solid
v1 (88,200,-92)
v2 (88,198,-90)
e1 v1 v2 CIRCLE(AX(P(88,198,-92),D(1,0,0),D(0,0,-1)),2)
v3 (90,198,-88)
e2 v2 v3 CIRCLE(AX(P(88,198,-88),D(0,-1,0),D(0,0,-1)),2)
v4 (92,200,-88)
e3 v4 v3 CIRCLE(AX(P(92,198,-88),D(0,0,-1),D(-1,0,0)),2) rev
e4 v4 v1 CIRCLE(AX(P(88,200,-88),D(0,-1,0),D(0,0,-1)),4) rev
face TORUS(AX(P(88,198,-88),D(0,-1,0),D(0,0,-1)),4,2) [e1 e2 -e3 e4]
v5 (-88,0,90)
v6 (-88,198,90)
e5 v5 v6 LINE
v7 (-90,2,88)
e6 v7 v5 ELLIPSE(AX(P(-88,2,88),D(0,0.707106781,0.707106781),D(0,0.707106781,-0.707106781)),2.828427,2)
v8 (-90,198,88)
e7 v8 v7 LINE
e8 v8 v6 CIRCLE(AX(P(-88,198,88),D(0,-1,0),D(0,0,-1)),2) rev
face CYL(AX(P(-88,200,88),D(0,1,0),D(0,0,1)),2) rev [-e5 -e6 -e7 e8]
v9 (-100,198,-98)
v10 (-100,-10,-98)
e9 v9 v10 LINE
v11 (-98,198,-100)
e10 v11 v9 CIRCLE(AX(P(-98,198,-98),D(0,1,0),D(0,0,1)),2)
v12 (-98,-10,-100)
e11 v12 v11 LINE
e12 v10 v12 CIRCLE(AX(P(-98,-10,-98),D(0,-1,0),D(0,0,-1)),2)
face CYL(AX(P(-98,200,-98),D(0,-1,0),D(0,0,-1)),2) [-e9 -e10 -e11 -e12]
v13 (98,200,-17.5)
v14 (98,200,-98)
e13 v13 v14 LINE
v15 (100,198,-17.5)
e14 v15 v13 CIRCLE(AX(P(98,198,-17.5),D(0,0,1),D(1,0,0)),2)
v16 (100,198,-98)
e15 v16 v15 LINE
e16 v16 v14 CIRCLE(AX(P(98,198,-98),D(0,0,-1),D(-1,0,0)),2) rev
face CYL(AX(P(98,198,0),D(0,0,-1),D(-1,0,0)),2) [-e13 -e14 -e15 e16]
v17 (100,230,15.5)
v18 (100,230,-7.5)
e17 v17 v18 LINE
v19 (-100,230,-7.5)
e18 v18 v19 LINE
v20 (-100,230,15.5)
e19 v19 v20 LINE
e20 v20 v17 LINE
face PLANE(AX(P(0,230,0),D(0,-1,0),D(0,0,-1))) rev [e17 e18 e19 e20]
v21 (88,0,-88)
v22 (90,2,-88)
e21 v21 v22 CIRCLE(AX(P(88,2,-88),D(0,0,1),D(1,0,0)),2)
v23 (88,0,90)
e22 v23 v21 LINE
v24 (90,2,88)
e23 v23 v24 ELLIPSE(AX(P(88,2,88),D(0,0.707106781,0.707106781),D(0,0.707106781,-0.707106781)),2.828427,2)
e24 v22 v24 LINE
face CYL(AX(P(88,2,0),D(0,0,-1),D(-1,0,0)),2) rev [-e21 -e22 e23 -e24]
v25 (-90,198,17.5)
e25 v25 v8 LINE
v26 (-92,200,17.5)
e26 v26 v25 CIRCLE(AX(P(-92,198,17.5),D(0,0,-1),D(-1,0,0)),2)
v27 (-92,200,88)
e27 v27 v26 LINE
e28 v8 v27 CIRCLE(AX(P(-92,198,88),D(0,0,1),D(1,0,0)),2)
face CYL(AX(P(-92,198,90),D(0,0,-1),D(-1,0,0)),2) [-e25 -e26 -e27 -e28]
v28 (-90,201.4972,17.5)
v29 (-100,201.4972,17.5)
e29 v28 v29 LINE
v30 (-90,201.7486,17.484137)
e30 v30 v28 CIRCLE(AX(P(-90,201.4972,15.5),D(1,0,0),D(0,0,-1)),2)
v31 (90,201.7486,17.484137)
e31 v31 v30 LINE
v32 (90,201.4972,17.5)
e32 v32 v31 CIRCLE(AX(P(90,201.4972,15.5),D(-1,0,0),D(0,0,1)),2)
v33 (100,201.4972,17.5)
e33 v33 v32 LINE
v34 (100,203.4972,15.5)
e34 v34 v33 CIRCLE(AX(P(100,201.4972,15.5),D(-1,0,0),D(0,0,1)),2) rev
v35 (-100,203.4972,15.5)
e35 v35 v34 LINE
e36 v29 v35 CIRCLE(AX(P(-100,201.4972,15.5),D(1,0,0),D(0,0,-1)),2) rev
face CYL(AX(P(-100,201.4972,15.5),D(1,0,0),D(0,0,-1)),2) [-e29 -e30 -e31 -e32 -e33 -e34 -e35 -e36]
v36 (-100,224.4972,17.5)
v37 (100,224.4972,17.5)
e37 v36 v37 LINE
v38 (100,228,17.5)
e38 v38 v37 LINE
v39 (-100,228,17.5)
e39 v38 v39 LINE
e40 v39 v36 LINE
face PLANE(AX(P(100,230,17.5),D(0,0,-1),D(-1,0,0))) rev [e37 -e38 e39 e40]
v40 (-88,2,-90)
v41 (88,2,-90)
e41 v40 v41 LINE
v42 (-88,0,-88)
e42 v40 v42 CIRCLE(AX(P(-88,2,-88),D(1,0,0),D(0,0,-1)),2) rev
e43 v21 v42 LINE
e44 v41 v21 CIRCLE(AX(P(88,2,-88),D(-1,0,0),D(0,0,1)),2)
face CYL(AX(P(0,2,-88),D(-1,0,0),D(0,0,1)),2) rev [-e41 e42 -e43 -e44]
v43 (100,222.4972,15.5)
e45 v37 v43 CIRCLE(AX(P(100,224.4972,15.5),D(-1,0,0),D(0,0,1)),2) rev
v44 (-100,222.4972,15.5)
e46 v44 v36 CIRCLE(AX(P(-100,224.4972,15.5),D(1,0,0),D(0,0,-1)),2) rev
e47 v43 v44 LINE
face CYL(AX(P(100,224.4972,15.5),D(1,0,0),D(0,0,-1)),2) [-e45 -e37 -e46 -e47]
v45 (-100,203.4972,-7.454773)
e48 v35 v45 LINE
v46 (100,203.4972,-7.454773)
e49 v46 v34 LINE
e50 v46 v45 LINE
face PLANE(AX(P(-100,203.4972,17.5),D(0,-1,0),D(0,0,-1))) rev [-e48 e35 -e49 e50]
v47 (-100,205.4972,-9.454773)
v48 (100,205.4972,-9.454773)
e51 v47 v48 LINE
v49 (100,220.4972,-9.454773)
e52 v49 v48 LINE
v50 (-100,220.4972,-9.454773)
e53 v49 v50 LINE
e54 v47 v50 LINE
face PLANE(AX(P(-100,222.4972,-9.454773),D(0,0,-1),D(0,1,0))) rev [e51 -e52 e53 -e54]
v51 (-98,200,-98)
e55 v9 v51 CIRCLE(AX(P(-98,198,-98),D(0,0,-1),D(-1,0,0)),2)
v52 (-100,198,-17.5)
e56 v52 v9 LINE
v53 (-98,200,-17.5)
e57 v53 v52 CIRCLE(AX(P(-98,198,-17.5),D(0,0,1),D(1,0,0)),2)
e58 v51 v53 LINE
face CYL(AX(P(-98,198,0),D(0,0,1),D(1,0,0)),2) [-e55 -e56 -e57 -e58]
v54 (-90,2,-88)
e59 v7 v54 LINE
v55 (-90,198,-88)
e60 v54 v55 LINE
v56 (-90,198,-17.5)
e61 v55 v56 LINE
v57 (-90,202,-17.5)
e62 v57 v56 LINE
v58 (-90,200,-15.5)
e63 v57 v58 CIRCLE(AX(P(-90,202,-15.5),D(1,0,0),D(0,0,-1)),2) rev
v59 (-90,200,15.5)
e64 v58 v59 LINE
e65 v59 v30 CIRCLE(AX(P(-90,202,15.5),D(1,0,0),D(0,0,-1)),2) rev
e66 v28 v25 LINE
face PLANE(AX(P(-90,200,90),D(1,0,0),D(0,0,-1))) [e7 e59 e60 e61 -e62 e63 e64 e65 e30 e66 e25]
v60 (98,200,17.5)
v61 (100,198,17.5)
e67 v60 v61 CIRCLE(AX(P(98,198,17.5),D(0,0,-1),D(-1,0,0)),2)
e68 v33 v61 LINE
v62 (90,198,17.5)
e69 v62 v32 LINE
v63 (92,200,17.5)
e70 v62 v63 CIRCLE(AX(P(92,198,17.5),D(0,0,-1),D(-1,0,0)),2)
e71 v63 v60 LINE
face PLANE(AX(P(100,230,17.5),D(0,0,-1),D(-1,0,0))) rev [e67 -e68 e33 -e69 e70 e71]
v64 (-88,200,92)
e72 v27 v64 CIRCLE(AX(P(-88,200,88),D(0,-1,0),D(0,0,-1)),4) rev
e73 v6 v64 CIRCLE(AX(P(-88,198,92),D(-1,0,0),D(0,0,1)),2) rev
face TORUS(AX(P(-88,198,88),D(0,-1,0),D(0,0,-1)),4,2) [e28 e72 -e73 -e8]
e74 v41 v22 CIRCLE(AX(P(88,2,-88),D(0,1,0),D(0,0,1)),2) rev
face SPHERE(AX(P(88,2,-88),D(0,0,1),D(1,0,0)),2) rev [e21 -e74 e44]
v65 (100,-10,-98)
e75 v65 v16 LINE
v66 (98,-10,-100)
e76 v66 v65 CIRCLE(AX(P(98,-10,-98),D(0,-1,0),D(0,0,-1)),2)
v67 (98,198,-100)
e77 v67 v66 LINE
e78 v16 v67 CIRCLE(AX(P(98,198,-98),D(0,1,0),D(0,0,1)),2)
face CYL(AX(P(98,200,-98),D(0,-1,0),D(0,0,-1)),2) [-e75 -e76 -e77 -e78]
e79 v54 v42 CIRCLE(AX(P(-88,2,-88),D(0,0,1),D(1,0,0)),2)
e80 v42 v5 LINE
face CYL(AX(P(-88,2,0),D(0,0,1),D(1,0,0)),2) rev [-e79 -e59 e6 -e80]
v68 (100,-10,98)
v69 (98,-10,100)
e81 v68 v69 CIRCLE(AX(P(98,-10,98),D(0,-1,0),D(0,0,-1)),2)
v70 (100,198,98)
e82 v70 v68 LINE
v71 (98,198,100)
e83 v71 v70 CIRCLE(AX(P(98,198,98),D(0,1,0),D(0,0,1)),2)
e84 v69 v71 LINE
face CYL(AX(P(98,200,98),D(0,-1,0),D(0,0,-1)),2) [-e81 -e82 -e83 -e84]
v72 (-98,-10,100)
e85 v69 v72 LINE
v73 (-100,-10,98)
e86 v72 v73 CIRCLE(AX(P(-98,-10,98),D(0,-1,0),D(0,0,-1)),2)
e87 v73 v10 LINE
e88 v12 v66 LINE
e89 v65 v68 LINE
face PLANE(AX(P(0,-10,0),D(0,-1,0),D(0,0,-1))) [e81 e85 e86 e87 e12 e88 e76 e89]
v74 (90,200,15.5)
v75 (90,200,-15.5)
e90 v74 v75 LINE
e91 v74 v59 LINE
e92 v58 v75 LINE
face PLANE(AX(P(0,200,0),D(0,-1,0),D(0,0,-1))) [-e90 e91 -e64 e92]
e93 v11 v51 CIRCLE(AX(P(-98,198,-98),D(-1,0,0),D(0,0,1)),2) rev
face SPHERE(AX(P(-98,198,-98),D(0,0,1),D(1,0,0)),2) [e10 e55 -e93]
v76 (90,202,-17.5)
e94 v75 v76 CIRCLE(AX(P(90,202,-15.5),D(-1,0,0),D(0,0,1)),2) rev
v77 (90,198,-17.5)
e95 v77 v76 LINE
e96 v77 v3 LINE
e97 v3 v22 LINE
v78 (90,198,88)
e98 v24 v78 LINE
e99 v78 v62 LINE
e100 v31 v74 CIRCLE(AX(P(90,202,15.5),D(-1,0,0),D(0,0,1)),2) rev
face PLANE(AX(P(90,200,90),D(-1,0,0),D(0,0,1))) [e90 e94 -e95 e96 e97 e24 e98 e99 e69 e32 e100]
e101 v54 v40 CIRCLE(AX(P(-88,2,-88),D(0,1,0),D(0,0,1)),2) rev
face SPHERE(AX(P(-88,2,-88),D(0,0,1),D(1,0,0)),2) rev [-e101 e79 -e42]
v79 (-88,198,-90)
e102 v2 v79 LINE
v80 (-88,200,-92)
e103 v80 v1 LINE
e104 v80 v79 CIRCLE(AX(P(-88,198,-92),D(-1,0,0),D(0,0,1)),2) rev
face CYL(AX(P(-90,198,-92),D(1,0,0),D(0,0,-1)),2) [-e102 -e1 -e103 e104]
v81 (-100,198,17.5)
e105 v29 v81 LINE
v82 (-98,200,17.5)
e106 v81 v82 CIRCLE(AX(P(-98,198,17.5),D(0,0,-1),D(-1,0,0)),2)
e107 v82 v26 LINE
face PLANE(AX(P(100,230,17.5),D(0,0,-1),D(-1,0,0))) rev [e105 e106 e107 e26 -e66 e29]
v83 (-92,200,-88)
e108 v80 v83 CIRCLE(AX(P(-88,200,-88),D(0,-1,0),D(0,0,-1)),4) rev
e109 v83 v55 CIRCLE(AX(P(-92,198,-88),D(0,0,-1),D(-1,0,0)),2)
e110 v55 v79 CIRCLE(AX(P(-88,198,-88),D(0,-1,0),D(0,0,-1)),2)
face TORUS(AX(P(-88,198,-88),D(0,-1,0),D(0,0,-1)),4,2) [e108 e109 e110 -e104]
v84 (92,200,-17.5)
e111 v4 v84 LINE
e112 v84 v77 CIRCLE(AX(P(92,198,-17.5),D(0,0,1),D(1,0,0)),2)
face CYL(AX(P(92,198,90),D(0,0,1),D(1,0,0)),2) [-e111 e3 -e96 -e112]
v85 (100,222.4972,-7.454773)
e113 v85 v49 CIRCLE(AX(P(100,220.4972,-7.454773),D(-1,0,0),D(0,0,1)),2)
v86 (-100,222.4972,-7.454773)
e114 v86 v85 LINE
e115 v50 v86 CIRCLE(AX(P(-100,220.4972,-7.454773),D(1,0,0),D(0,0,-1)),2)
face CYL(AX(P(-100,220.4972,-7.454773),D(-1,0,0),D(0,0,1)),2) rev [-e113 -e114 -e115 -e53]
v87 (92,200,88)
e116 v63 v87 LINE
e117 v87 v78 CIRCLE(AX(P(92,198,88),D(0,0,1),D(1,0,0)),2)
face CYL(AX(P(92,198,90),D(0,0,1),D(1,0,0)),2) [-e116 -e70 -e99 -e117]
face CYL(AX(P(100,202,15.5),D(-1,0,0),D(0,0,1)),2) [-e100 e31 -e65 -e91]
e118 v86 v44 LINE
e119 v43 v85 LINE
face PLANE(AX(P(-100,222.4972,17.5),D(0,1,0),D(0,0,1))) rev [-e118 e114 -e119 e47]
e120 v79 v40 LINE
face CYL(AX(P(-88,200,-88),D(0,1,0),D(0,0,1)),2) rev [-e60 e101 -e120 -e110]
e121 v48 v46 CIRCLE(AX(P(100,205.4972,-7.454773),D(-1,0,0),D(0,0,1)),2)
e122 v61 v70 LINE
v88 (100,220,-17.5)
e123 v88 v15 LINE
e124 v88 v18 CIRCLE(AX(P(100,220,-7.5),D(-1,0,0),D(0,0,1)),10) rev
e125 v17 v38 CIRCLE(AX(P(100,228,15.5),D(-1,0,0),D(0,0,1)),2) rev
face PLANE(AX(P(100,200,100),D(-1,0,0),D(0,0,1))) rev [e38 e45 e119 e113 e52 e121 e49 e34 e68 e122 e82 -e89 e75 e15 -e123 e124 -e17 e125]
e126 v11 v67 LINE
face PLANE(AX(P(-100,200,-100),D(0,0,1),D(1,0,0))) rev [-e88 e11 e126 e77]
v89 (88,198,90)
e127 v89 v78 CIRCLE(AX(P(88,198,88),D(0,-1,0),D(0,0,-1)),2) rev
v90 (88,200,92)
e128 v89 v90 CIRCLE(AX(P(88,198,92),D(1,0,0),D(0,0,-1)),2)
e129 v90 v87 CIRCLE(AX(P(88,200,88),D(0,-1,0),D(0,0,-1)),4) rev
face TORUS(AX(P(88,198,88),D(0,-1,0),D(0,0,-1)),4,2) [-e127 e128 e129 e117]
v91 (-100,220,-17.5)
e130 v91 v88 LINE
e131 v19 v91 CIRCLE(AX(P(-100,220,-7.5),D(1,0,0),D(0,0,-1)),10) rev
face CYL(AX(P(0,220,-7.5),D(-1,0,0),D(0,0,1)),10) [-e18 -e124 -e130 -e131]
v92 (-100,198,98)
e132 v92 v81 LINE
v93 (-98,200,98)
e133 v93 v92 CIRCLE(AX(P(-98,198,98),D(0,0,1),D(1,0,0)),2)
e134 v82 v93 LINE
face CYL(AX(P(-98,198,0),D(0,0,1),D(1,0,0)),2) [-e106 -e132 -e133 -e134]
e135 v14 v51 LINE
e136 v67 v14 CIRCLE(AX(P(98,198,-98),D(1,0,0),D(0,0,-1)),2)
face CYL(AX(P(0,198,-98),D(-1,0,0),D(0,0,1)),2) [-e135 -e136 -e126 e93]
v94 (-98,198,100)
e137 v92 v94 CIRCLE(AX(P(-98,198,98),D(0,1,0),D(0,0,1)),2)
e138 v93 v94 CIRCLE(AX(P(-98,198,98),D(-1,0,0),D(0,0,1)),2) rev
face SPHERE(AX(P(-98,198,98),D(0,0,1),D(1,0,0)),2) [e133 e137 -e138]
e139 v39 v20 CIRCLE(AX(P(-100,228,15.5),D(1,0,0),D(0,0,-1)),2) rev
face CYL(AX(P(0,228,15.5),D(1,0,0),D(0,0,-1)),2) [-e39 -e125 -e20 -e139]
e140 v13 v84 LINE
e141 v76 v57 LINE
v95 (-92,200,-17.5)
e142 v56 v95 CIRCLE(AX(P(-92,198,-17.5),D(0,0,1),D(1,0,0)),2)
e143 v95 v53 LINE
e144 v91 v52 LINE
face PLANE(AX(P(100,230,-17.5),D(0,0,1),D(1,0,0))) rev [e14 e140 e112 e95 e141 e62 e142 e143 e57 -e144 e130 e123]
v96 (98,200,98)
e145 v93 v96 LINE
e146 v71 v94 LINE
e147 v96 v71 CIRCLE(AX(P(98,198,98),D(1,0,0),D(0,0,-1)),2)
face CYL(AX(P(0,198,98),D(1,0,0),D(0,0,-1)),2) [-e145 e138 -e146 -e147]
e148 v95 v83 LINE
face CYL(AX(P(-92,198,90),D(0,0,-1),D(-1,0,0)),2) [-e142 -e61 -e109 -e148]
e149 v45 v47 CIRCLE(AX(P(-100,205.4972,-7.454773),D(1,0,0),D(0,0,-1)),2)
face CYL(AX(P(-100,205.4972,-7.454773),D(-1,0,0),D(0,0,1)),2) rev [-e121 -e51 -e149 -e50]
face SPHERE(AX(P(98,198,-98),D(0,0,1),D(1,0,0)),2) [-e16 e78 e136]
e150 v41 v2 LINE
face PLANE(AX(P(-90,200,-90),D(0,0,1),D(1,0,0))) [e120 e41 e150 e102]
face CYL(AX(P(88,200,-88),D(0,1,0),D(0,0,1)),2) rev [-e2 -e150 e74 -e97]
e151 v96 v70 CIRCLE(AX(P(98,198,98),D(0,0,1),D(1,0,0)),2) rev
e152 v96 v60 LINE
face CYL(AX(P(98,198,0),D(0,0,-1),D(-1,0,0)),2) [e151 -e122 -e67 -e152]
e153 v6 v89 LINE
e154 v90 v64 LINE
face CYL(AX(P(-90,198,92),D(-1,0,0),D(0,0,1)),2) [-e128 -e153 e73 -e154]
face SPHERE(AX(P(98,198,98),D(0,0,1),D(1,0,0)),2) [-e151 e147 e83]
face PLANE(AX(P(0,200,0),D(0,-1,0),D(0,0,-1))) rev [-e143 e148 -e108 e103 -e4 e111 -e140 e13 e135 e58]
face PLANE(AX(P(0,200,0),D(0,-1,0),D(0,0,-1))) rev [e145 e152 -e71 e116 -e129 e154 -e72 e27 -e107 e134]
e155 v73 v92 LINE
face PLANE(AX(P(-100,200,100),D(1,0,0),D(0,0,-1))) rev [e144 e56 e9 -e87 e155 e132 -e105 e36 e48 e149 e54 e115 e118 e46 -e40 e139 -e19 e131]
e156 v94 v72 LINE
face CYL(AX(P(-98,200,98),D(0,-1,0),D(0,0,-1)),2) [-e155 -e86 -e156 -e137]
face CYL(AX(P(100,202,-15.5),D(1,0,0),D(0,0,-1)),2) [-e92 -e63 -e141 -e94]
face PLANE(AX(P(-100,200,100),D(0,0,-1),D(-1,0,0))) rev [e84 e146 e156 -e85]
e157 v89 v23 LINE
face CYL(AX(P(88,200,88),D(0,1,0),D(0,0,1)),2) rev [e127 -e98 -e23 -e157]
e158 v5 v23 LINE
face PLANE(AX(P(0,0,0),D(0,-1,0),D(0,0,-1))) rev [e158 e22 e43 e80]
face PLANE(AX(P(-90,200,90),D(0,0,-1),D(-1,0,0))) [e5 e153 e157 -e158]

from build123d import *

# Parameters (mm, degrees)
SKETCH1_W               = 200
SKETCH1_H               = 200
SKETCH1_W_2             = 180
SKETCH1_H_2             = 180
BOSS_EXTRUDE1_DEPTH     = 200
SKETCH2_W               = 200
SKETCH2_H               = 200
BOSS_EXTRUDE2_DEPTH     = 10
SKETCH3_W               = 200
SKETCH3_H               = 35
BOSS_EXTRUDE3_DEPTH     = 30
CUT_EXTRUDE1_DEPTH      = 321.780298647
CUT_EXTRUDE1_DEPTH_BACK = 321.780298647
SKETCH4_W               = 26.954773083
SKETCH4_H               = 19
FILLET1_R               = 10
FILLET3_R               = 2
FILLET4_R               = 2
FILLET6_R               = 2
FILLET7_R               = 2
FILLET8_R               = 2
FILLET9_R               = 2


with BuildPart() as part:
    # Sketch1 → Boss-Extrude1 (new body)
    with BuildSketch(Plane(origin=(0, 0, 0), x_dir=(1, 0, 0), z_dir=(0, 1, 0))):
        Rectangle(SKETCH1_W, SKETCH1_H)
        Rectangle(SKETCH1_W_2, SKETCH1_H_2, mode=Mode.SUBTRACT)
    extrude(amount=BOSS_EXTRUDE1_DEPTH)

    # Sketch2 → Boss-Extrude2 (add)
    with BuildSketch(Plane.XZ):
        Rectangle(SKETCH2_W, SKETCH2_H)
    extrude(amount=BOSS_EXTRUDE2_DEPTH)

    # Sketch3 → Boss-Extrude3 (add)
    with BuildSketch(Plane(origin=(0, 200, 0), x_dir=(1, 0, 0), z_dir=(0, 1, 0))):
        Rectangle(SKETCH3_W, SKETCH3_H)
    extrude(amount=BOSS_EXTRUDE3_DEPTH)

    # Sketch4 → Cut-Extrude1 (cut, two sides: drawn at the far end of the back side and taken through both)
    with BuildSketch(Plane(origin=(100, 0, 0), x_dir=(0, 0, -1), z_dir=(1, 0, 0)).offset(-CUT_EXTRUDE1_DEPTH_BACK)):
        with Locations((-4.022613458, 212.997200487)):
            Rectangle(SKETCH4_W, SKETCH4_H)
    extrude(amount=CUT_EXTRUDE1_DEPTH + CUT_EXTRUDE1_DEPTH_BACK, mode=Mode.SUBTRACT)

    # Fillet1
    fillet1_edges = [part.edges().sort_by_distance(p)[0] for p in [
        (0, 230, -17.5),
    ]]
    fillet(fillet1_edges, radius=FILLET1_R)

    # Fillet3
    fillet3_edges = [part.edges().sort_by_distance(p)[0] for p in [
        (0, 200, -17.5),
    ]]
    fillet(fillet3_edges, radius=FILLET3_R)

    # Fillet4
    fillet4_edges = [part.edges().sort_by_distance(p)[0] for p in [
        (-100, 200, -58.75),
        (90, 0, 0),
        (90, 100, 90),
        (0, 0, -90),
        (90, 100, -90),
        (-90, 0, 0),
        (-90, 100, -90),
        (-90, 100, 90),
        (90, 200, 53.75),
        (0, 200, 100),
        (0, 200, -90),
        (-90, 200, -53.75),
        (0, 200, 90),
        (100, 200, -58.75),
        (-100, 200, 58.75),
        (90, 200, -53.75),
        (-90, 200, 53.75),
        (100, 200, 58.75),
        (100, 95, 100),
        (-100, 95, 100),
        (-100, 95, -100),
        (100, 95, -100),
        (0, 200, -100),
    ]]
    fillet(fillet4_edges, radius=FILLET4_R)

    # Fillet6
    fillet6_edges = [part.edges().sort_by_distance(p)[0] for p in [
        (0, 200, 17.5),
    ]]
    fillet(fillet6_edges, radius=FILLET6_R)

    # Fillet7
    fillet7_edges = [part.edges().sort_by_distance(p)[0] for p in [
        (0, 203.497200487, -9.454773083),
    ]]
    fillet(fillet7_edges, radius=FILLET7_R)

    # Fillet8
    fillet8_edges = [part.edges().sort_by_distance(p)[0] for p in [
        (0, 230, 17.5),
        (0, 222.497200487, -9.454773083),
        (0, 222.497200487, 17.5),
    ]]
    fillet(fillet8_edges, radius=FILLET8_R)

    # Fillet9
    # the kernel refuses this fillet: 2 mm, written as the material it takes off along each edge
    with BuildSketch(Plane(origin=(-105, 203.497200487, 17.5), x_dir=(0, 0, -1), z_dir=(1, 0, 0))) as fillet9_piece_1:
        with BuildLine():
            CenterArc((FILLET9_R, -FILLET9_R), FILLET9_R, 90, 90)
            Line((0, -FILLET9_R), (0, 0))
            Line((0, 0), (FILLET9_R, 0))
        make_face()
    extrude(amount=210, mode=Mode.SUBTRACT)


solid = part.part
